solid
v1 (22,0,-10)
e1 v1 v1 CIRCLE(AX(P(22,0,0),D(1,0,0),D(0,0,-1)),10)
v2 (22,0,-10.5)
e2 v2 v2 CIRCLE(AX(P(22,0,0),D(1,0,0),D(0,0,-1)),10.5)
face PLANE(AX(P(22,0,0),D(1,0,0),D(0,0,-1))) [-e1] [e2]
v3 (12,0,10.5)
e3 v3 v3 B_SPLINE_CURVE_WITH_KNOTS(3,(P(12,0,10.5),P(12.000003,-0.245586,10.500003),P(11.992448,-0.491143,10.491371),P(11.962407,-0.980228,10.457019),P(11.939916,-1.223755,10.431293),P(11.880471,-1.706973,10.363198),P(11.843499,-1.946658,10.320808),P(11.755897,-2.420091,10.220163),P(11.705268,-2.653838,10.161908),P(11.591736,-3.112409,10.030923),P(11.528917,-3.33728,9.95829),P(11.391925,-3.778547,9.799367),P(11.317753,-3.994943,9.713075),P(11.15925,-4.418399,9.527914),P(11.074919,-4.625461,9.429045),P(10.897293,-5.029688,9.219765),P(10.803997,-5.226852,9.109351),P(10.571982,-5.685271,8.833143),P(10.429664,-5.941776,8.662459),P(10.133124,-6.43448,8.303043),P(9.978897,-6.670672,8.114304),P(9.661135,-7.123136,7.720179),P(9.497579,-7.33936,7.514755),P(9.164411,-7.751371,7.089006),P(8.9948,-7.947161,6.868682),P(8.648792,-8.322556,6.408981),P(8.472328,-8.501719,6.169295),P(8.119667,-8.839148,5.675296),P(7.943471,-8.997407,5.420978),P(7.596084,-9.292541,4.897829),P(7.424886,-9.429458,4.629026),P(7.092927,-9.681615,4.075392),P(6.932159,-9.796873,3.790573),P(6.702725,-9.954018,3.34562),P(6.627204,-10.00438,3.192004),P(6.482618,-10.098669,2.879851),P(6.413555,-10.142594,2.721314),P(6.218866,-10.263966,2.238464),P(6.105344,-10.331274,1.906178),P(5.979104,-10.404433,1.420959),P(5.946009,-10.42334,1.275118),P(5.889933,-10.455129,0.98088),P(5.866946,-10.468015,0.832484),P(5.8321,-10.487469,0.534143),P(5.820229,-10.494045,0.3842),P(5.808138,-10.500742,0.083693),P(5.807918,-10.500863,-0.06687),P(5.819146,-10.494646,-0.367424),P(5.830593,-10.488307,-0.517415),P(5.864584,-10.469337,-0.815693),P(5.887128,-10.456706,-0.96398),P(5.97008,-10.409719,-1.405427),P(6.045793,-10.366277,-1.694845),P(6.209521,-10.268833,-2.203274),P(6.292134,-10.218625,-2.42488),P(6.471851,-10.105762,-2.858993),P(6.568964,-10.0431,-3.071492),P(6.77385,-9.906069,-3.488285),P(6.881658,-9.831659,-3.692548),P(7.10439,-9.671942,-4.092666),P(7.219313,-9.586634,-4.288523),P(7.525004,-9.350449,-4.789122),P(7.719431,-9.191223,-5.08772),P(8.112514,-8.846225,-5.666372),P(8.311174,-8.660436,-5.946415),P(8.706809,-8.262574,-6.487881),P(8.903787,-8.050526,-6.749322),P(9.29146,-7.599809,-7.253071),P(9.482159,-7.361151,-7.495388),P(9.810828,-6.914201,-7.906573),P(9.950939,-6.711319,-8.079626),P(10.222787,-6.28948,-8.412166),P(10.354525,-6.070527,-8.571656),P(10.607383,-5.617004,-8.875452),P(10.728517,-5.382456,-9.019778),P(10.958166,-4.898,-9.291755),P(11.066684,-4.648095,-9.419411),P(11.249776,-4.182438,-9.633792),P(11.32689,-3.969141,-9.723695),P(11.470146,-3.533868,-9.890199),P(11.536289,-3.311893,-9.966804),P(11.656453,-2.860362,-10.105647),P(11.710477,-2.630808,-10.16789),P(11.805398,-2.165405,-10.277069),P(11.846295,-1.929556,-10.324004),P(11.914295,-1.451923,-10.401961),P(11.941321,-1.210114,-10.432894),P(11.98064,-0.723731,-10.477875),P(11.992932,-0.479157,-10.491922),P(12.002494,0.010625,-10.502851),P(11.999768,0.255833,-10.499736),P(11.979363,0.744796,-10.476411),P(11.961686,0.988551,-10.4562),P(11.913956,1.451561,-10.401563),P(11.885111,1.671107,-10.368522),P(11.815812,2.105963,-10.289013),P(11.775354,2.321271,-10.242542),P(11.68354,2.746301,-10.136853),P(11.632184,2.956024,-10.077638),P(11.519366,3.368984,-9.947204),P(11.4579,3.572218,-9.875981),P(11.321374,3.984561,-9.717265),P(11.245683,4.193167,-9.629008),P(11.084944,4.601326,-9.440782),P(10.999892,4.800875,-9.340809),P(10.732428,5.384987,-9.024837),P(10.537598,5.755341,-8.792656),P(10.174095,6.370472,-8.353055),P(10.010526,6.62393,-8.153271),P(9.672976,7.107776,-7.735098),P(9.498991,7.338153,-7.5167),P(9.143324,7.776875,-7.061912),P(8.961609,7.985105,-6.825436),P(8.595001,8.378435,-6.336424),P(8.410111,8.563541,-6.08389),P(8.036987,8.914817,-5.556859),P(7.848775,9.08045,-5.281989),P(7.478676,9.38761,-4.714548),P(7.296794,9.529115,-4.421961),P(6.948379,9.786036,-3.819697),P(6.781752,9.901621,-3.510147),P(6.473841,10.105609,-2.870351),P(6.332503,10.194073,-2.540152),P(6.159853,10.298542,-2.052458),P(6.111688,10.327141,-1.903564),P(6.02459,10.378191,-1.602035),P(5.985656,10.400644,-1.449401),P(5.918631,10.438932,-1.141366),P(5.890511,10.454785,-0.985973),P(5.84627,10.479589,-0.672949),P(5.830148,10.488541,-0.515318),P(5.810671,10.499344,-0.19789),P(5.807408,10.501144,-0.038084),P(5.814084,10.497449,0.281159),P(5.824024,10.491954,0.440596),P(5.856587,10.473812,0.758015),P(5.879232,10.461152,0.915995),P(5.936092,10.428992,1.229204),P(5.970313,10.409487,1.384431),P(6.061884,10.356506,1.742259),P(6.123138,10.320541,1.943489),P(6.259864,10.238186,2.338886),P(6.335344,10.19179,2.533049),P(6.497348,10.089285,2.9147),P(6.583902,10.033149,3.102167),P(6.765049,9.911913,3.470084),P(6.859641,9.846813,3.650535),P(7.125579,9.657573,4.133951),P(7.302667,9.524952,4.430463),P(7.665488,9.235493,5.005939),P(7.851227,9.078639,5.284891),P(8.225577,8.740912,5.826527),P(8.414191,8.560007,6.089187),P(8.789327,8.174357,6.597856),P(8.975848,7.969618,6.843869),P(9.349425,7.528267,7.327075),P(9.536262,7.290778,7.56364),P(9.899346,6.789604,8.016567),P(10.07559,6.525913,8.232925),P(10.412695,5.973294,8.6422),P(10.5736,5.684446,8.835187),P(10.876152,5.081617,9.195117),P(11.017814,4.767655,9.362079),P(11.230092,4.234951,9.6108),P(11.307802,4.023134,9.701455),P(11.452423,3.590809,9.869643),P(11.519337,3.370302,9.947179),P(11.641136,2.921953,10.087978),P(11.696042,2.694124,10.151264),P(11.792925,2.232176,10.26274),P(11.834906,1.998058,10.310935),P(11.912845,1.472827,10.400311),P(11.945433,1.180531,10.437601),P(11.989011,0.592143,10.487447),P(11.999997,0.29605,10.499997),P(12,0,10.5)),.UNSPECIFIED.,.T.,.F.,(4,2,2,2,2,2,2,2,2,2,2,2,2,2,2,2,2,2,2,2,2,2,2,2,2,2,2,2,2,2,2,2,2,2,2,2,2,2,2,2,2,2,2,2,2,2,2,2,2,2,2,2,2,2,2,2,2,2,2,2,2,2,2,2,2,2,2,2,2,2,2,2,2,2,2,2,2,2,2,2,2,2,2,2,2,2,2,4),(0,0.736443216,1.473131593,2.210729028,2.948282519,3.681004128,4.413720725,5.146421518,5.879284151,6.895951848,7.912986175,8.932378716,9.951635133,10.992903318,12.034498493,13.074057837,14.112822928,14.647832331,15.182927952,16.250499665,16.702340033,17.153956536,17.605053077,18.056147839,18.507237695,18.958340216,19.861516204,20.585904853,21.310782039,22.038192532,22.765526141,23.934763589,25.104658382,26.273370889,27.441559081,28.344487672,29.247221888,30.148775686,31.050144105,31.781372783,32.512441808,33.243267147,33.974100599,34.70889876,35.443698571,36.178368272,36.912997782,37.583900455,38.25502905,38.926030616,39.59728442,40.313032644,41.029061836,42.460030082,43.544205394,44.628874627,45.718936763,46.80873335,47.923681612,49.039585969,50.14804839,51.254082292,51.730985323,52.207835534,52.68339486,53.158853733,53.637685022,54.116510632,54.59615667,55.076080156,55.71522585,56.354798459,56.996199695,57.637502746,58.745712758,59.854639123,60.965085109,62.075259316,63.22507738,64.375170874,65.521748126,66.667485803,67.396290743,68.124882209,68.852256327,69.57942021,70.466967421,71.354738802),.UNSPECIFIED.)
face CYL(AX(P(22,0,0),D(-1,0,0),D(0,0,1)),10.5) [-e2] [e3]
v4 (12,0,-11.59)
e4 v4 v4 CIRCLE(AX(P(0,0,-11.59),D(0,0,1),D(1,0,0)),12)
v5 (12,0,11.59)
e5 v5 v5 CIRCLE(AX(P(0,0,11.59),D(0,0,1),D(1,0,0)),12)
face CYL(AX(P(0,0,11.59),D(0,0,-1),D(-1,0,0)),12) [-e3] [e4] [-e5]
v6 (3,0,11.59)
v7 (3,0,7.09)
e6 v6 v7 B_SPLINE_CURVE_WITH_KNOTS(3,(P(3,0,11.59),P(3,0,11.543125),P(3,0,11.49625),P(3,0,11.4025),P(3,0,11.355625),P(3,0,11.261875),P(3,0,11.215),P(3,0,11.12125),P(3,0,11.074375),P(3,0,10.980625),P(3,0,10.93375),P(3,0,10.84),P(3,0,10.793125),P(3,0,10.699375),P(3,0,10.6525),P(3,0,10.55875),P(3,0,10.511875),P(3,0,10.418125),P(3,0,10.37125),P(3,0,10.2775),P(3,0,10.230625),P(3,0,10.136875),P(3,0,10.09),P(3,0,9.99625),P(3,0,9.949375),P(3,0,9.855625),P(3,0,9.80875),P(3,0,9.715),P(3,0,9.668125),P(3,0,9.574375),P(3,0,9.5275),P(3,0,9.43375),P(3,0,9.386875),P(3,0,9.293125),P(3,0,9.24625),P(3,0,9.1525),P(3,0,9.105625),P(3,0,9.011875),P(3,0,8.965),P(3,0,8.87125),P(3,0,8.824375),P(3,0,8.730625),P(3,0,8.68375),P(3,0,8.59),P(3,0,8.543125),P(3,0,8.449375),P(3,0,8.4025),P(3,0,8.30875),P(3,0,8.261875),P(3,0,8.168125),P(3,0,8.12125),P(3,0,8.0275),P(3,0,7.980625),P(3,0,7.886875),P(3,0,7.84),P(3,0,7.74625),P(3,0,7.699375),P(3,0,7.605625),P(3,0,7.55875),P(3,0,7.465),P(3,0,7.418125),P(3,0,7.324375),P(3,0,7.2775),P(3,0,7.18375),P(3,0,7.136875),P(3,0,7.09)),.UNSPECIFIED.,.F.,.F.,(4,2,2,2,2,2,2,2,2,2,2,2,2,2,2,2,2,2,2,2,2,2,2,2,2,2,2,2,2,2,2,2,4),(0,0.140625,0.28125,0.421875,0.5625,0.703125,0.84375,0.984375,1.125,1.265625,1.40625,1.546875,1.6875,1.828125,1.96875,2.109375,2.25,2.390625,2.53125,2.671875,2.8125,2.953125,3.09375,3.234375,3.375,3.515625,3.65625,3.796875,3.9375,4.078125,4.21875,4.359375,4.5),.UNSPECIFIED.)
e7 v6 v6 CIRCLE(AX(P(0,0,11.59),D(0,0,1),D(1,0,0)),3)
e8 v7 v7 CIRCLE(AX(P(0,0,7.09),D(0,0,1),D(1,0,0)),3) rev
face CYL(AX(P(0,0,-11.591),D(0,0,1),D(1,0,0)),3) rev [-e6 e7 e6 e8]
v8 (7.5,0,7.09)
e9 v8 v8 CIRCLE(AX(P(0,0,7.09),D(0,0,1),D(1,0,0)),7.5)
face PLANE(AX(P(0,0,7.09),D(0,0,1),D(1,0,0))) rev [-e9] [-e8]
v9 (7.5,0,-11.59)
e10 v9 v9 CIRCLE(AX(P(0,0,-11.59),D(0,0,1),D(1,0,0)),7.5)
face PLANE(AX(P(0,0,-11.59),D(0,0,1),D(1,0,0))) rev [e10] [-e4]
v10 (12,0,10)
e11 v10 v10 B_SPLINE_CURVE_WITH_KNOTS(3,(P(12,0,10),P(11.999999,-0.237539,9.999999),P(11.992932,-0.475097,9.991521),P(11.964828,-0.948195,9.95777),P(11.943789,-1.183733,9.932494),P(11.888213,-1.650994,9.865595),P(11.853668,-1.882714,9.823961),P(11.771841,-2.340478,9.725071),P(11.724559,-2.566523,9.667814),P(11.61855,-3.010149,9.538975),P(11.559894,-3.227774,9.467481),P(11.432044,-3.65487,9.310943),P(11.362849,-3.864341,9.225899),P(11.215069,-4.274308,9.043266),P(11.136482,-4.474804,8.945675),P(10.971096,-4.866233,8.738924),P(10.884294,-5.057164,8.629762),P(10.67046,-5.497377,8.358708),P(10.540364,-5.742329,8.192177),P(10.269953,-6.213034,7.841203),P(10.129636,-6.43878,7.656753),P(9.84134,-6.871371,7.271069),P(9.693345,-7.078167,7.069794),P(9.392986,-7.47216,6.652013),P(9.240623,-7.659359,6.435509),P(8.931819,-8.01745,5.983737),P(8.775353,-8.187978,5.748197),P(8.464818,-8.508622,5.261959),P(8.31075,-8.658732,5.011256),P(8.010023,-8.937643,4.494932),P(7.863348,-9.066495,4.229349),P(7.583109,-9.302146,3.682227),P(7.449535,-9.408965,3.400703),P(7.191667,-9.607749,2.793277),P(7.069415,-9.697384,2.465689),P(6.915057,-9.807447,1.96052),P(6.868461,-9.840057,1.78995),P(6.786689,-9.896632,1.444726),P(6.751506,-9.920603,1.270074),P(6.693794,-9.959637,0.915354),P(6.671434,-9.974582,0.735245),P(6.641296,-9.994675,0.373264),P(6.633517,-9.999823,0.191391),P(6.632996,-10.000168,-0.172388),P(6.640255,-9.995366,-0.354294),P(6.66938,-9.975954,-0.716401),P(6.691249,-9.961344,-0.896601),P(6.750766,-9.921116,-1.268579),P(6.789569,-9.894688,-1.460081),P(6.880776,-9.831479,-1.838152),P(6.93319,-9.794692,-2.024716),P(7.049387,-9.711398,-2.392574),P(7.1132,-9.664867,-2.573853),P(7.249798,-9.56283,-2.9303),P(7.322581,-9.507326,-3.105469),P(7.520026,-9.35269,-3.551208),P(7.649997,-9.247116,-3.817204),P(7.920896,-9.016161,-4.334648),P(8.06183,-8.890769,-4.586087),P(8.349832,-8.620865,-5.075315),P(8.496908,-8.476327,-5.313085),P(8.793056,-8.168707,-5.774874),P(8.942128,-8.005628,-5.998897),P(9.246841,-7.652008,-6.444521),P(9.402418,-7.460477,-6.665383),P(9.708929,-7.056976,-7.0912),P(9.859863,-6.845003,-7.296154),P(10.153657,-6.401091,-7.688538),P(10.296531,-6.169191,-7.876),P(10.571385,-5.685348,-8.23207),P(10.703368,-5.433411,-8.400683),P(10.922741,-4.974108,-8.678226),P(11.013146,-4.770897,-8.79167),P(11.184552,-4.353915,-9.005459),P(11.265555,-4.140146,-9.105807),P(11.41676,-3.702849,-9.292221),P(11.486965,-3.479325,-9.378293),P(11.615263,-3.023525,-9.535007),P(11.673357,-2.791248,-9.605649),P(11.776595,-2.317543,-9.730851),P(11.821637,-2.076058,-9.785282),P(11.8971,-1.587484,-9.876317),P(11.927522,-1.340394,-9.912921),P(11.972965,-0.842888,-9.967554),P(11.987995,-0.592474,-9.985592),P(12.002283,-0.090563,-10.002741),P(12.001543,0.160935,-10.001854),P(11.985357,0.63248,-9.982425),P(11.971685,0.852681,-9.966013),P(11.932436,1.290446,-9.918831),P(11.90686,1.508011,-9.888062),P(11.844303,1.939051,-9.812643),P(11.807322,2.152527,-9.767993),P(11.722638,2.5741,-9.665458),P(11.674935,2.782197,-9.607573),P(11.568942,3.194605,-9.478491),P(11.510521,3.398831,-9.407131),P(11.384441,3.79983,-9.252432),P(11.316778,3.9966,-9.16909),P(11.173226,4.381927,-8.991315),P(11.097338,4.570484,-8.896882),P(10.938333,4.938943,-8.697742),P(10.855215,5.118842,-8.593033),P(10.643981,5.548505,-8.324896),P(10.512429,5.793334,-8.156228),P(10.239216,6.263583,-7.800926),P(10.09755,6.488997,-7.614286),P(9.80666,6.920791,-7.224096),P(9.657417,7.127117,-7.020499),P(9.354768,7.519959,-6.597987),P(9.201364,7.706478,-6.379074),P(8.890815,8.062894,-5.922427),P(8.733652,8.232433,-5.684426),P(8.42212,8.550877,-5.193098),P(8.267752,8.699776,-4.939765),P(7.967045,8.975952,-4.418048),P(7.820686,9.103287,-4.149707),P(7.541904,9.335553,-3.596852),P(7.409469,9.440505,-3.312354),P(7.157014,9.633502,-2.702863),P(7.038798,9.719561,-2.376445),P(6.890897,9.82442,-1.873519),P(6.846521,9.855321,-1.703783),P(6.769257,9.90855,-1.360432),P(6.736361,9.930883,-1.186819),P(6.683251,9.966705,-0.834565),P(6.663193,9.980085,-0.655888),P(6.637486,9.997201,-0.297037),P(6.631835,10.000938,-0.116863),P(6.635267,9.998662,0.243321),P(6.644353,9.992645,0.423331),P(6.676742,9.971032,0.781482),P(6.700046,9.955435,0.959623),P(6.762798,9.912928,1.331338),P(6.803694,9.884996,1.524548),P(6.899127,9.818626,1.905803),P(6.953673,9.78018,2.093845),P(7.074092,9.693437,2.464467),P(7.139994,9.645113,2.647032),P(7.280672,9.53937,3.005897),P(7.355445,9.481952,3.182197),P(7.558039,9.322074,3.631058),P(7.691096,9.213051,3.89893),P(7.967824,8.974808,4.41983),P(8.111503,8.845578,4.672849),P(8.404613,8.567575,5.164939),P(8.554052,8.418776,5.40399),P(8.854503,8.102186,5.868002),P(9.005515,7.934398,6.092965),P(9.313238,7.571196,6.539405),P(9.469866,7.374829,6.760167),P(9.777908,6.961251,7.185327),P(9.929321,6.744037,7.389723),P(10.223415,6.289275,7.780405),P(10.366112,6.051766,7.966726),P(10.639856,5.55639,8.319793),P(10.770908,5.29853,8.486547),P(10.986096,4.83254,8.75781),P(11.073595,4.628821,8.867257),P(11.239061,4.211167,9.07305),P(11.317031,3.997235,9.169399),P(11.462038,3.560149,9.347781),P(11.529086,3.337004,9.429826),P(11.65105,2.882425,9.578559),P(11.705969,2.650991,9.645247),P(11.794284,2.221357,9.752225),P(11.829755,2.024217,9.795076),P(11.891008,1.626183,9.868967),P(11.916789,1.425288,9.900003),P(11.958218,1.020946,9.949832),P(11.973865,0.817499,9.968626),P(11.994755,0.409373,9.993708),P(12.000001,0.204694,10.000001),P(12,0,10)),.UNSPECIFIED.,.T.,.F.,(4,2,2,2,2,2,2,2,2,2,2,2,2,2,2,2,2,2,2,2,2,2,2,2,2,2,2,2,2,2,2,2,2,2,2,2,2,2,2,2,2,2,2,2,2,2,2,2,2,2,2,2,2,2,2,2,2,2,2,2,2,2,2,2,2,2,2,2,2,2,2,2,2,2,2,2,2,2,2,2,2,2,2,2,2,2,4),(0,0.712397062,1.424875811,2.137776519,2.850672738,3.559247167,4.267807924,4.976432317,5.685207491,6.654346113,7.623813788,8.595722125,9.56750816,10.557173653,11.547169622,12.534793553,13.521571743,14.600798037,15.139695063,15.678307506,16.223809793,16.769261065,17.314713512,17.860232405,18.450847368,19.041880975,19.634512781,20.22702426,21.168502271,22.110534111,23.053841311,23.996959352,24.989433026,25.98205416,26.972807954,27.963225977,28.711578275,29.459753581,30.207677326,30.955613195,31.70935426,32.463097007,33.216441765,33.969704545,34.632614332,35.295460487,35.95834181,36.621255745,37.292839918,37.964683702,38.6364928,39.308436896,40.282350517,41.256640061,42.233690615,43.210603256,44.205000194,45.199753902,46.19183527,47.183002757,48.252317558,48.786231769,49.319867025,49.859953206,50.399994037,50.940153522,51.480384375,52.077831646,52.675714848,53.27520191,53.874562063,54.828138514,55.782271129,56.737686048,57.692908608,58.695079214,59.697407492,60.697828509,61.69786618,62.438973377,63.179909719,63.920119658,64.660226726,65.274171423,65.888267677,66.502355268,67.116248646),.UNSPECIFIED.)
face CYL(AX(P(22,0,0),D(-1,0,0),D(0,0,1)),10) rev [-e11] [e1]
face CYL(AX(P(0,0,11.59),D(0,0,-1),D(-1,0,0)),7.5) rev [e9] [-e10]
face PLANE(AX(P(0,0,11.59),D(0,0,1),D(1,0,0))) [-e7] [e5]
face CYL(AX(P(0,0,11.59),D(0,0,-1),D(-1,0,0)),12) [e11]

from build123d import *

# Parameters (mm, degrees)
SKETCH1_R           = 12
BOSS_EXTRUDE1_DEPTH = 11.59
SKETCH3_R           = 10.5
SKETCH3_R_2         = 10
EXTRUDE_THIN1_DEPTH = 22
SHELL1_START        = -11.59
SHELL1_OUTLINE_R    = 7.5
SHELL1_DEPTH        = 18.68
CUT_EXTRUDE1_REACH  = 36.137
SKETCH4_R           = 3


# Read off the part's stored shape, not the designer's step: Shell1
with BuildPart() as part:
    # Sketch1 → Boss-Extrude1 (new, symmetric)
    with BuildSketch(Plane.XY):
        Circle(SKETCH1_R)
    extrude(amount=BOSS_EXTRUDE1_DEPTH, both=True)

    # Sketch3 → Extrude-Thin1 (add)
    with BuildSketch(Plane(origin=(0, 0, 0), x_dir=(0, 0, -1), z_dir=(1, 0, 0))):
        Circle(SKETCH3_R)
        Circle(SKETCH3_R_2, mode=Mode.SUBTRACT)
    extrude(amount=EXTRUDE_THIN1_DEPTH)

    # Shell1 outline → Shell1 (cut)
    with BuildSketch(Plane.XY.offset(SHELL1_START)):
        Circle(SHELL1_OUTLINE_R)
    extrude(amount=SHELL1_DEPTH, mode=Mode.SUBTRACT)

    # Sketch4 → Cut-Extrude1 (cut, up to next)
    with BuildSketch(Plane.XY.offset(11.59), mode=Mode.PRIVATE) as cut_extrude1_sk1:
        Circle(SKETCH4_R)
    cut_extrude1_tool1 = extrude(cut_extrude1_sk1.sketch, amount=-CUT_EXTRUDE1_REACH, mode=Mode.PRIVATE) & part.part
    add(cut_extrude1_tool1.solids().sort_by_distance((0, 0, 11.59))[0], mode=Mode.SUBTRACT)


solid = part.part
